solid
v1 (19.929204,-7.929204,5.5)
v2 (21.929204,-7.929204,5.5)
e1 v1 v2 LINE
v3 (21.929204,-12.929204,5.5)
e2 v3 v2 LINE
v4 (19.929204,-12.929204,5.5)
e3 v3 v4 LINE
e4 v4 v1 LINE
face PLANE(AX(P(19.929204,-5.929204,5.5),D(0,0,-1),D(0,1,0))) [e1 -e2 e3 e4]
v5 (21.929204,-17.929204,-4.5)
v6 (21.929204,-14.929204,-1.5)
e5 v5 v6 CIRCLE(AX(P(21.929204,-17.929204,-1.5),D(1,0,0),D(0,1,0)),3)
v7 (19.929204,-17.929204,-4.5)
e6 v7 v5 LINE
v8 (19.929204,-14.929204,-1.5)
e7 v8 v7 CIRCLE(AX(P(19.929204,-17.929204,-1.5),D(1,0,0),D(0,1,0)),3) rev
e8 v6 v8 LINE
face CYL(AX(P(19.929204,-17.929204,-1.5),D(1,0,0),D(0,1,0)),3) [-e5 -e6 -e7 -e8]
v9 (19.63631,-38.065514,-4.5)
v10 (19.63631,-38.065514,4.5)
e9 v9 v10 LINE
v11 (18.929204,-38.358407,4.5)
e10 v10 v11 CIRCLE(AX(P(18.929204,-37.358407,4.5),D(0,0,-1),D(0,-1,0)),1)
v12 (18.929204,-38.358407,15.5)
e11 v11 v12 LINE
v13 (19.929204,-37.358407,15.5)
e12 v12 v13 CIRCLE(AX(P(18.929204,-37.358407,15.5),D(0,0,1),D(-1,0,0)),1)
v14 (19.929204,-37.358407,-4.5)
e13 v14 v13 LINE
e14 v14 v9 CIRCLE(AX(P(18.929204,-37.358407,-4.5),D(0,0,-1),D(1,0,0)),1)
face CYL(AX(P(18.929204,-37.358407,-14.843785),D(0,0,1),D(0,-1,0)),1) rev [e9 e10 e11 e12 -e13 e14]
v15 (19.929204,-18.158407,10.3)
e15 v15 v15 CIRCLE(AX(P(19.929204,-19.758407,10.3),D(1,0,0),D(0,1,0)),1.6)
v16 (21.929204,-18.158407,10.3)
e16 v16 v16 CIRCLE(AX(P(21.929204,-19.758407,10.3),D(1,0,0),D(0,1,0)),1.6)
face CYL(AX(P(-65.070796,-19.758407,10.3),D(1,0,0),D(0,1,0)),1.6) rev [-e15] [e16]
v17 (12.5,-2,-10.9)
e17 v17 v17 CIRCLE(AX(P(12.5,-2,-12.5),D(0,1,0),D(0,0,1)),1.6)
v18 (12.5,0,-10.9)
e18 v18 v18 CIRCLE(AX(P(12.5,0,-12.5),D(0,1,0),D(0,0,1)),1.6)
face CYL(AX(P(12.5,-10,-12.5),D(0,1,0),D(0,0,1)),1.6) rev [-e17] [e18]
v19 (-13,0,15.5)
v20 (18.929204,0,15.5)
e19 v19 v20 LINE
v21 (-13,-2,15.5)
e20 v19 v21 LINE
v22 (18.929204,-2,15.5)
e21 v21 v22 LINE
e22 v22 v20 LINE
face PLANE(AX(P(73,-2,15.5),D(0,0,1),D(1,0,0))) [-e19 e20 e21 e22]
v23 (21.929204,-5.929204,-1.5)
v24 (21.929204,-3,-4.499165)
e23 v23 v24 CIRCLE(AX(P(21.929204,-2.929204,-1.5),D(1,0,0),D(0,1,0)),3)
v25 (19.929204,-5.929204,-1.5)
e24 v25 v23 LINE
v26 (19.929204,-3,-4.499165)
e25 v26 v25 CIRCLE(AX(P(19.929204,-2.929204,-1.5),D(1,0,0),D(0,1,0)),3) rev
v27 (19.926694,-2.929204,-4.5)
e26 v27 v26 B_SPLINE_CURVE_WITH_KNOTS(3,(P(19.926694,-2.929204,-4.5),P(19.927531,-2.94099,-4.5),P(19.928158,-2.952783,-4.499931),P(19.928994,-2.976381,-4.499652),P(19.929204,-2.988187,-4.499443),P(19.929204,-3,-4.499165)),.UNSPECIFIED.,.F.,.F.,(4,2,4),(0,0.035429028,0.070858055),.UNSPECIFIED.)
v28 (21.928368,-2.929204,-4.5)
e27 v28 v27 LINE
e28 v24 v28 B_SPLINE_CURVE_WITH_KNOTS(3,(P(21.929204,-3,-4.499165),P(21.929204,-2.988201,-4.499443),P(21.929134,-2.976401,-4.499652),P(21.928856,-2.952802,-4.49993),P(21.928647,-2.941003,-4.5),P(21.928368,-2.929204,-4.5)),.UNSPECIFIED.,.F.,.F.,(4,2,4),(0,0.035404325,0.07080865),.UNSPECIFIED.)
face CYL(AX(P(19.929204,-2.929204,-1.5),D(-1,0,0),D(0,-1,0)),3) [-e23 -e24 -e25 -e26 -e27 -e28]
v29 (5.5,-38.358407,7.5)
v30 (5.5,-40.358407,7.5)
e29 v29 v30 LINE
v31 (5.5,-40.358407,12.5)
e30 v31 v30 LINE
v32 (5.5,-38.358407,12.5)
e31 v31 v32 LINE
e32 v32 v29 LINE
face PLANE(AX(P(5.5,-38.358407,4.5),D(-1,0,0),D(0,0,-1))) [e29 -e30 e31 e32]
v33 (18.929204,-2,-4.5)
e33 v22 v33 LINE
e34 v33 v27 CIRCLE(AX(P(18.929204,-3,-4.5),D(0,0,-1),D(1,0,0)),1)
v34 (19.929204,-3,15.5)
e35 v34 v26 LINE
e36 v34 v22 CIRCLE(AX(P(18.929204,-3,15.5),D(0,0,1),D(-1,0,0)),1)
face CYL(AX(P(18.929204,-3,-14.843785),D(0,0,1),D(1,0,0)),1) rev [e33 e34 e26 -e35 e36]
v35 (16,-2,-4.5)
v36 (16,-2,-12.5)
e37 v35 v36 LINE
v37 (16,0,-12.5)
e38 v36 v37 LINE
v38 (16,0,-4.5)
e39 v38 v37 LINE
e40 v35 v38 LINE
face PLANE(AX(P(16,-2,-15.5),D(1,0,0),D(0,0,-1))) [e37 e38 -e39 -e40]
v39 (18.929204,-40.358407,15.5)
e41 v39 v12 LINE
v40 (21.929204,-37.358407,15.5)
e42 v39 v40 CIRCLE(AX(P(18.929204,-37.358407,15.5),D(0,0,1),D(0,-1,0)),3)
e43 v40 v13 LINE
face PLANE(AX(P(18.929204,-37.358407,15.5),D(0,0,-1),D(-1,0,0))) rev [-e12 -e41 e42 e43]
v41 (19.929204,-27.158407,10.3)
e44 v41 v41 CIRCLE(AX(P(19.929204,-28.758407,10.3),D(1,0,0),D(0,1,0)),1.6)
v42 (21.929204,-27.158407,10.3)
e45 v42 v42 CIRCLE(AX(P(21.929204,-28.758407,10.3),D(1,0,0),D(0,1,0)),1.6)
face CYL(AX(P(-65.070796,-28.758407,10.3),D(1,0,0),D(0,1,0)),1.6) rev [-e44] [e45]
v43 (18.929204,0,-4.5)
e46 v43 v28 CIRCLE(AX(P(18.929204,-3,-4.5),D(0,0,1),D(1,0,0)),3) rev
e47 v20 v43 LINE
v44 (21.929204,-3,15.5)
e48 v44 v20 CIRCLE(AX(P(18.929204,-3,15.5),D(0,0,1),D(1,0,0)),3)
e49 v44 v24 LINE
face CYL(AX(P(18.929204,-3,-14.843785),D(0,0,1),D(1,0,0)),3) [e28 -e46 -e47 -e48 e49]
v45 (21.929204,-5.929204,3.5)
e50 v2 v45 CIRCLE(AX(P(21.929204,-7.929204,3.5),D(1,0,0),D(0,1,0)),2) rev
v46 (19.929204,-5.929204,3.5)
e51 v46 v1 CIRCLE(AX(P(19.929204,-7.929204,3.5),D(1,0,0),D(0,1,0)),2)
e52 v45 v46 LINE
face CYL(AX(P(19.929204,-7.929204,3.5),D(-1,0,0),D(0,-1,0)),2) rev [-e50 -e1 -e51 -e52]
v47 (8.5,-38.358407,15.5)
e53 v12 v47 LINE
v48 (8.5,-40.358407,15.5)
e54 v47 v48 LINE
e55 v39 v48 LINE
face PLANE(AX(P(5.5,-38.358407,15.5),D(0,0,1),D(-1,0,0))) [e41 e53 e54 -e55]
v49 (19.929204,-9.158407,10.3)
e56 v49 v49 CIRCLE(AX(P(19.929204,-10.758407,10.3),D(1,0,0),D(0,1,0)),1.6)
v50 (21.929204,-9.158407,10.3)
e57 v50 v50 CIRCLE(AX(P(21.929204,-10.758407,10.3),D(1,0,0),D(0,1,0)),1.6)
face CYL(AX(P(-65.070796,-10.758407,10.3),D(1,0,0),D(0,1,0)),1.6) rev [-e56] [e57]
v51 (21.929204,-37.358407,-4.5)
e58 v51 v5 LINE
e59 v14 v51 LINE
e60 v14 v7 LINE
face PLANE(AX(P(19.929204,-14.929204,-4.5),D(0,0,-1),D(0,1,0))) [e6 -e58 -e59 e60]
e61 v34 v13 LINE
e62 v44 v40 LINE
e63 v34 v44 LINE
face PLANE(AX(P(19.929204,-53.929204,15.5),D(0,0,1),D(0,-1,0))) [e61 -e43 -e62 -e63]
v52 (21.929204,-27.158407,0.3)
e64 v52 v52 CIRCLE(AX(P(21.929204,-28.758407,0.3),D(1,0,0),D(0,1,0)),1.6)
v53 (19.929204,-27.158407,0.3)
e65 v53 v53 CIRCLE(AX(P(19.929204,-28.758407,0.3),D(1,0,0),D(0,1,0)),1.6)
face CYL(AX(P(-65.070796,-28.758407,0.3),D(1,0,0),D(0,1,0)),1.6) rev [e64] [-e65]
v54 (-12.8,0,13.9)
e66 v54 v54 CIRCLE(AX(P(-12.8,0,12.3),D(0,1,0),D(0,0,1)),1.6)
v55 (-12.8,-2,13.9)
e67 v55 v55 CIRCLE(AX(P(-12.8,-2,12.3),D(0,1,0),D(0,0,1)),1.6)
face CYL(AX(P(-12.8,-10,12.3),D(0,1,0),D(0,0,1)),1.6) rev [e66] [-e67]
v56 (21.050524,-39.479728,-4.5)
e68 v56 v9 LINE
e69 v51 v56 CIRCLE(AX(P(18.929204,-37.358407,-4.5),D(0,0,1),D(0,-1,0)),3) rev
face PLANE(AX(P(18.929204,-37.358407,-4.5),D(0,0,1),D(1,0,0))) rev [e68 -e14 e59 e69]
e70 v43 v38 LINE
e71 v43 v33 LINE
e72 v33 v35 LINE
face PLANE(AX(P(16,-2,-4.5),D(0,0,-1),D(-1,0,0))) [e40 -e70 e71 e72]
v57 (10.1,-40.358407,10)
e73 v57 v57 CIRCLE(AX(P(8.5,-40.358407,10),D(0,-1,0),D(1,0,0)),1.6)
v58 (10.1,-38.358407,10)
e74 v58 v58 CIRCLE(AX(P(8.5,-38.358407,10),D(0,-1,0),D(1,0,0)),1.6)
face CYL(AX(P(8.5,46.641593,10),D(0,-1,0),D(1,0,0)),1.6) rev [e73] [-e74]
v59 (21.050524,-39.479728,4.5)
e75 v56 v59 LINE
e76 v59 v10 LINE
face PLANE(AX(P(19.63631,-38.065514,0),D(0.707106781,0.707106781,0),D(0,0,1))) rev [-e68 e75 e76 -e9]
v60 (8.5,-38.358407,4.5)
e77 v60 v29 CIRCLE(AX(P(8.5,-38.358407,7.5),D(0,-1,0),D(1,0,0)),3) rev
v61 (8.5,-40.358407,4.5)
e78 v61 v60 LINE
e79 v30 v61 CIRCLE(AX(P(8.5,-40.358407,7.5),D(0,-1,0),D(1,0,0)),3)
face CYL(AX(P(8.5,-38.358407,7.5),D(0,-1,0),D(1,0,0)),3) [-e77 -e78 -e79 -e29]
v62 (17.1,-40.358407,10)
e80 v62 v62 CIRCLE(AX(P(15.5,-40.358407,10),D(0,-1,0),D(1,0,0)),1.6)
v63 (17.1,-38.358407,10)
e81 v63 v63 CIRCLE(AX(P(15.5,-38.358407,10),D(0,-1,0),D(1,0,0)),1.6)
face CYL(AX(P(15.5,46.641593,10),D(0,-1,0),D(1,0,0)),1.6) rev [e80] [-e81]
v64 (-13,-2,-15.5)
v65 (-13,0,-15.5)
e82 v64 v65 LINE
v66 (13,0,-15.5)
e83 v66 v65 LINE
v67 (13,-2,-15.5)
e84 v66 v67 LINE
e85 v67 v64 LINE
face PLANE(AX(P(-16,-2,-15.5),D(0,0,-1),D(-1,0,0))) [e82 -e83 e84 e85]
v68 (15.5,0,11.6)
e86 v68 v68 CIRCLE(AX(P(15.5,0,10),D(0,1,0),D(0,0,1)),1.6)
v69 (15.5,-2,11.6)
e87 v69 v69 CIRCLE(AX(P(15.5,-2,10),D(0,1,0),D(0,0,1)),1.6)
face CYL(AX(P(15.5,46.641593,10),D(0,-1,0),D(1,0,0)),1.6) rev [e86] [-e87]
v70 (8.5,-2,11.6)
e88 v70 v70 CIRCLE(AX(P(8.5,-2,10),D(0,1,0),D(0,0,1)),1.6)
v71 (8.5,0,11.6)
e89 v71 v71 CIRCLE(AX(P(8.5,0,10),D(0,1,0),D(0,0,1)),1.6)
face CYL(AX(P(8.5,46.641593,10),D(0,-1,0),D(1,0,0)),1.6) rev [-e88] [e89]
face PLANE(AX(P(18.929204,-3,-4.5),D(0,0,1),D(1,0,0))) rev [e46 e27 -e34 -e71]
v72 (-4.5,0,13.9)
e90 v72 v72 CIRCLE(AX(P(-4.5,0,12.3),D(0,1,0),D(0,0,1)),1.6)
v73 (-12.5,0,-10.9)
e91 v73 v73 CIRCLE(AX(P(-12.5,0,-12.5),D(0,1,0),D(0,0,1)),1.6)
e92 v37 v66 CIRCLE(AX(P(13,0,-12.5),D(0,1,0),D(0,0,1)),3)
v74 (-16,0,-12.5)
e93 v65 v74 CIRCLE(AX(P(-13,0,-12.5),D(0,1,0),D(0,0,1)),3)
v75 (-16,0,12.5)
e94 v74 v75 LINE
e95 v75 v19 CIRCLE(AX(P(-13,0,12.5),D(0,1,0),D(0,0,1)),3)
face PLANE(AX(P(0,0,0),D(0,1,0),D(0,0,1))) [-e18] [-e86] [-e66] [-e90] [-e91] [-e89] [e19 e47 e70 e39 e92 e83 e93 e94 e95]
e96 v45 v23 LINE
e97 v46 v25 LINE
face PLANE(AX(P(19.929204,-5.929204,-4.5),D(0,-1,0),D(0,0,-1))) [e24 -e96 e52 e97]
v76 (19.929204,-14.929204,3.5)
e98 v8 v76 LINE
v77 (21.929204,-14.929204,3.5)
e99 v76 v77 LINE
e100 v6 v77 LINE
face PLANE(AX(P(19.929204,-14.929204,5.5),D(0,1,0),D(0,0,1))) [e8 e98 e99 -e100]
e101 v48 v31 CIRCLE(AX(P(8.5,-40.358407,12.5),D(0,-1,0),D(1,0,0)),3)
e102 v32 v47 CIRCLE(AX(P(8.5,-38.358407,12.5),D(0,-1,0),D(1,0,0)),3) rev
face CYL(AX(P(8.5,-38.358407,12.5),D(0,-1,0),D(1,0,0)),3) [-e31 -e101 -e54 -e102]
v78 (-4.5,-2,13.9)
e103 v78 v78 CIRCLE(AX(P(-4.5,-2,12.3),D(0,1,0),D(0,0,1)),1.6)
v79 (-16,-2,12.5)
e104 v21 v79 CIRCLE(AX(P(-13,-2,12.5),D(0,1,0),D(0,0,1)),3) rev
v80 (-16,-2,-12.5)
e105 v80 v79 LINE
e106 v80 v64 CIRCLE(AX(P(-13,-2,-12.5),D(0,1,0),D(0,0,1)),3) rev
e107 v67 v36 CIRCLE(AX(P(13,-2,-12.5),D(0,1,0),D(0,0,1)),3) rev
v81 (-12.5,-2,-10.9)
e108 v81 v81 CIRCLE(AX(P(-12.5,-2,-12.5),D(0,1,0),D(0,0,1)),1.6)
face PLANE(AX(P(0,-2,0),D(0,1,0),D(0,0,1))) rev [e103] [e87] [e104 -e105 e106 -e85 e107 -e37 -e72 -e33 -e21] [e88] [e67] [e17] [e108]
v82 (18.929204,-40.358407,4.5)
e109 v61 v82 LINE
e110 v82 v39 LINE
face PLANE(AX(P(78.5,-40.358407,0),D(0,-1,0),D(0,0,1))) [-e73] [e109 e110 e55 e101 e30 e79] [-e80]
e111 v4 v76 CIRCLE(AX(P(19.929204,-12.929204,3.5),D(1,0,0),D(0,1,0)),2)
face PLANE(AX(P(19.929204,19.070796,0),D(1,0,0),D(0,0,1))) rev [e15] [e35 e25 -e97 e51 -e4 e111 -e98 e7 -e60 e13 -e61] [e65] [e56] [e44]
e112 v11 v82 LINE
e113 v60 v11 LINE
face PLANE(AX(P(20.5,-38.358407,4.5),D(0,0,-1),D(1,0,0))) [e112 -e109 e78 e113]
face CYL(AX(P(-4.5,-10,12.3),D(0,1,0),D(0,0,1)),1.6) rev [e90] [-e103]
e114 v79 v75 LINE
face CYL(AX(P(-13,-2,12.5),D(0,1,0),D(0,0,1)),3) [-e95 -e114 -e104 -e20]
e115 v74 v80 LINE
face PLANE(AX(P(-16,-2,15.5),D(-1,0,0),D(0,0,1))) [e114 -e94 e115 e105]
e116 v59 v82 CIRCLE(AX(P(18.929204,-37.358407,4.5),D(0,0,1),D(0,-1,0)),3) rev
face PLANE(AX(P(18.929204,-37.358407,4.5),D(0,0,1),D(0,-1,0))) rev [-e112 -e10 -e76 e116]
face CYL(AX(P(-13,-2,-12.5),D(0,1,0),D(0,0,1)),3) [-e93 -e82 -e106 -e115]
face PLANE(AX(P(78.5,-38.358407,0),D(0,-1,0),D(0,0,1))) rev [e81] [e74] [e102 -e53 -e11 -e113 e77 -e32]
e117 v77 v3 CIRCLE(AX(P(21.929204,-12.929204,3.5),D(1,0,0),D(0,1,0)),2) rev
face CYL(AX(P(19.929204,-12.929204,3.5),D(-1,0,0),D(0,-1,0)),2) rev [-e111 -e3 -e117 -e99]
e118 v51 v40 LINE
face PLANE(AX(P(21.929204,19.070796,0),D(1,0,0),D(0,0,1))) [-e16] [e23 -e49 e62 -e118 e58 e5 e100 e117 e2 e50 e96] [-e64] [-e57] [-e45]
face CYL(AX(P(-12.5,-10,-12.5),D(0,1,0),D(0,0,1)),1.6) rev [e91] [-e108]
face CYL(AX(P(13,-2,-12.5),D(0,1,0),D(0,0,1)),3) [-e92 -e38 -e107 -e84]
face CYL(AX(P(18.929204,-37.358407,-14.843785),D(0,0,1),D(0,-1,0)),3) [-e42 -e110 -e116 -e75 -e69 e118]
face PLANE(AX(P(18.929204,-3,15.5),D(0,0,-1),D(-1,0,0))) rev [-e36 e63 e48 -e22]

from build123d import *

# Parameters (mm, degrees)
SM_BASE_FLANGE_1_DEPTH = 2
OTHER_START            = -4.5
OTHER_3_DEPTH          = 20
OTHER_3_2_OUTLINE_W    = 2
OTHER_3_2_OUTLINE_H    = 24
OTHER_3_2_DEPTH        = 20
OTHER_START_2          = 5.5
OTHER_3_3_OUTLINE_W    = 2
OTHER_3_3_OUTLINE_H    = 15
OTHER_3_3_OUTLINE_H_2  = 9
OTHER_3_3_DEPTH        = 10
OTHER_START_3          = 4.5
OTHER_3_4_OUTLINE_W    = 2
OTHER_3_4_OUTLINE_H    = 15
OTHER_3_4_DEPTH        = 1
OTHER_4_DEPTH          = 20
OTHER_4_2_DEPTH        = 9
OTHER_4_3_DEPTH        = 11
OTHER_4_4_DEPTH        = 9
SKETCH_10_R            = 1.6
CUT_EXTRUDE_1_DEPTH    = 10
SKETCH_11_R            = 1.6
CUT_EXTRUDE_2_DEPTH    = 10
SKETCH_13_R            = 1.6
CUT_EXTRUDE_3_DEPTH    = 87
CUT_EXTRUDE_4_DEPTH    = 87
SKETCH_15_R            = 1.6
CUT_EXTRUDE_5_DEPTH    = 87
FILLET_1_R             = 3
FILLET_2_R             = 2


# Read off the part's stored shape, not the designer's step: 绘制的折弯3, 绘制的折弯4
# Sheet-metal steps are written as plain solids
with BuildPart() as part:
    # Sketch 1 → 基体-法兰1 (new body)
    with BuildSketch(Plane(origin=(0, 0, 0), x_dir=(1, 0, 0), z_dir=(0, 1, 0))):
        Polygon((-16, -15.5), (16, -15.5), (73, -15.5), (73, -4.5), (58, -4.5), (58, 4.5), (34, 4.5), (34, -5.5), (25, -5.5), (25, 4.5), (16, 4.5), (16, 15.5), (-16, 15.5), align=None)
    extrude(amount=-SM_BASE_FLANGE_1_DEPTH)

    # Other 3 outline → Other 3 (cut)
    with BuildSketch(Plane.XY.offset(OTHER_START)):
        with BuildLine():
            ThreePointArc((18.929203673, 0), (20.661254481, -0.550510257), (21.757630798, -2))
            Line((21.757630798, -2), (73, -2))
            Line((73, -2), (73, 0))
            Line((73, 0), (18.929203673, 0))
        make_face()
    extrude(amount=OTHER_3_DEPTH, mode=Mode.SUBTRACT)

    # Other 3 2 outline → Other 3 2 (add)
    with BuildSketch(Plane.XY.offset(OTHER_START)):
        with Locations((20.929203673, -26.929203673)):
            Rectangle(OTHER_3_2_OUTLINE_W, OTHER_3_2_OUTLINE_H)
        with BuildLine():
            Line((19.929203673, -3), (19.929203673, -5.929203673))
            Line((19.929203673, -5.929203673), (21.929203673, -5.929203673))
            Line((21.929203673, -5.929203673), (21.929203673, -3))
            ThreePointArc((21.929203673, -3), (21.885999352, -2.492694064), (21.757630798, -2))
            Line((21.757630798, -2), (18.929203673, -2))
            ThreePointArc((18.929203673, -2), (19.636310454, -2.292893219), (19.929203673, -3))
        make_face()
    extrude(amount=OTHER_3_2_DEPTH)

    # Other 3 3 outline → Other 3 3 (add)
    with BuildSketch(Plane.XY.offset(OTHER_START_2)):
        with Locations((20.929203673, -46.429203673)):
            Rectangle(OTHER_3_3_OUTLINE_W, OTHER_3_3_OUTLINE_H)
        with Locations((20.929203673, -10.429203673)):
            Rectangle(OTHER_3_3_OUTLINE_W, OTHER_3_3_OUTLINE_H_2)
    extrude(amount=OTHER_3_3_DEPTH)

    # Other 3 4 outline → Other 3 4 (add)
    with BuildSketch(Plane.XY.offset(OTHER_START_3)):
        with Locations((20.929203673, -46.429203673)):
            Rectangle(OTHER_3_4_OUTLINE_W, OTHER_3_4_OUTLINE_H)
    extrude(amount=OTHER_3_4_DEPTH)

    # Other 4 outline → Other 4 (cut)
    with BuildSketch(Plane.XY.offset(OTHER_START)):
        with BuildLine():
            Line((19.929203673, -40.186834471), (19.929203673, -53.929203673))
            Line((19.929203673, -53.929203673), (21.929203673, -53.929203673))
            Line((21.929203673, -53.929203673), (21.929203673, -37.358407346))
            ThreePointArc((21.929203673, -37.358407346), (21.378693416, -39.090458154), (19.929203673, -40.186834471))
        make_face()
    extrude(amount=OTHER_4_DEPTH, mode=Mode.SUBTRACT)

    # Other 4 2 outline → Other 4 2 (cut)
    with BuildSketch(Plane.XY.offset(OTHER_START)):
        Polygon((19.929203673, -38.929203673), (20.5, -38.929203673), (19.929203673, -38.358407347), align=None)
    extrude(amount=OTHER_4_2_DEPTH, mode=Mode.SUBTRACT)

    # Other 4 3 outline → Other 4 3 (add)
    with BuildSketch(Plane.XY.offset(OTHER_START_3)):
        with BuildLine():
            ThreePointArc((18.929203673, -40.358407346), (19.436509609, -40.315203025), (19.929203673, -40.186834471))
            Line((19.929203673, -40.186834471), (19.929203673, -37.358407346))
            ThreePointArc((19.929203673, -37.358407346), (19.636310454, -38.065514128), (18.929203673, -38.358407346))
            Line((18.929203673, -38.358407346), (5.5, -38.358407346))
            Line((5.5, -38.358407346), (5.5, -40.358407346))
            Line((5.5, -40.358407346), (18.929203673, -40.358407346))
        make_face()
    extrude(amount=OTHER_4_3_DEPTH)

    # Other 4 4 outline → Other 4 4 (add)
    with BuildSketch(Plane.XY.offset(OTHER_START)):
        with BuildLine():
            Line((20.5, -38.929203673), (21.050524017, -39.47972769))
            ThreePointArc((21.050524017, -39.47972769), (21.283955222, -39.217209419), (21.485098605, -38.929203673))
            Line((21.485098605, -38.929203673), (20.5, -38.929203673))
        make_face()
        with BuildLine():
            Line((19.636310454, -38.065514128), (19.929203673, -38.358407347))
            Line((19.929203673, -38.358407347), (19.929203673, -37.358407346))
            ThreePointArc((19.929203673, -37.358407346), (19.853083206, -37.741090779), (19.636310454, -38.065514128))
        make_face()
    extrude(amount=OTHER_4_4_DEPTH)

    # 草图10 → 切除-拉伸1 (cut)
    with BuildSketch(Plane(origin=(0, 0, 0), x_dir=(1, 0, 0), z_dir=(0, 1, 0))):
        with Locations(Location((-12.5, 12.5, 0), (0, 0, 270))):
            Circle(SKETCH_10_R)
        with Locations(Location((12.5, 12.5, 0), (0, 0, 270))):
            Circle(SKETCH_10_R)
    extrude(amount=-CUT_EXTRUDE_1_DEPTH, mode=Mode.SUBTRACT)

    # 草图11 → 切除-拉伸2 (cut)
    with BuildSketch(Plane(origin=(0, 0, 0), x_dir=(1, 0, 0), z_dir=(0, 1, 0))):
        with Locations(Location((-12.8, -12.3, 0), (0, 0, 270))):
            Circle(SKETCH_11_R)
        with Locations(Location((-4.5, -12.3, 0), (0, 0, 270))):
            Circle(SKETCH_11_R)
    extrude(amount=-CUT_EXTRUDE_2_DEPTH, mode=Mode.SUBTRACT)

    # 草图13 → 切除-拉伸3 (cut)
    with BuildSketch(Plane(origin=(0, -40.358407346, 0), x_dir=(-1, 0, 0), z_dir=(0, -1, 0))):
        with Locations(Location((-8.5, -10, 0), (0, 0, 180))):
            Circle(SKETCH_13_R)
        with Locations(Location((-15.5, -10, 0), (0, 0, 180))):
            Circle(SKETCH_13_R)
    extrude(amount=-CUT_EXTRUDE_3_DEPTH, mode=Mode.SUBTRACT)

    # 草图14 → 切除-拉伸4 (cut)
    with BuildSketch(Plane(origin=(21.929203673, 0, 0), x_dir=(0, 0, -1), z_dir=(1, 0, 0))):
        with BuildLine():
            Line((-10.3, -19.758407346), (-10.3, -20.179203673))
            Line((-10.3, -20.179203673), (-10.3, -21.358407346))
            ThreePointArc((-10.3, -21.358407346), (-9.16862915, -20.889778196), (-8.7, -19.758407346))
            ThreePointArc((-8.7, -19.758407346), (-9.16862915, -18.627036497), (-10.3, -18.158407346))
            Line((-10.3, -18.158407346), (-10.3, -19.758407346))
        make_face()
        with BuildLine():
            ThreePointArc((-10.3, -18.158407346), (-11.571470433, -18.78713862), (-11.843674335, -20.179203673))
            Line((-11.843674335, -20.179203673), (-10.3, -20.179203673))
            Line((-10.3, -20.179203673), (-10.3, -19.758407346))
            Line((-10.3, -19.758407346), (-10.3, -18.158407346))
        make_face()
        with BuildLine():
            Line((-10.3, -20.179203673), (-11.843674335, -20.179203673))
            ThreePointArc((-11.843674335, -20.179203673), (-11.271268726, -21.029877779), (-10.3, -21.358407346))
            Line((-10.3, -21.358407346), (-10.3, -20.179203673))
        make_face()
        with BuildLine():
            ThreePointArc((-8.7, -28.758407346), (-9.16862915, -27.627036497), (-10.3, -27.158407346))
            Line((-10.3, -27.158407346), (-10.3, -28.758407346))
            Line((-10.3, -28.758407346), (-10.3, -30.358407346))
            ThreePointArc((-10.3, -30.358407346), (-9.16862915, -29.889778196), (-8.7, -28.758407346))
        make_face()
        with BuildLine():
            Line((-10.3, -28.758407346), (-10.3, -27.158407346))
            ThreePointArc((-10.3, -27.158407346), (-11.9, -28.758407346), (-10.3, -30.358407346))
            Line((-10.3, -30.358407346), (-10.3, -28.758407346))
        make_face()
        with BuildLine():
            ThreePointArc((-8.7, -10.758407346), (-11.43137085, -9.627036497), (-10.3, -12.358407346))
            ThreePointArc((-10.3, -12.358407346), (-9.16862915, -11.889778196), (-8.7, -10.758407346))
        make_face()
    extrude(amount=-CUT_EXTRUDE_4_DEPTH, mode=Mode.SUBTRACT)

    # 草图15 → 切除-拉伸5 (cut)
    with BuildSketch(Plane(origin=(21.929203673, 0, 0), x_dir=(0, 0, -1), z_dir=(1, 0, 0))):
        with Locations(Location((-0.3, -28.758407346, 0), (0, 0, 90))):
            Circle(SKETCH_15_R)
    extrude(amount=-CUT_EXTRUDE_5_DEPTH, mode=Mode.SUBTRACT)

    # 圆角1
    fillet_1_edges = [part.edges().sort_by_distance(p)[0] for p in [
        (5.5, -39.358407346, 4.5),
        (5.5, -39.358407346, 15.5),
        (20.929203673, -5.929203673, -4.5),
        (20.929203673, -14.929203673, -4.5),
        (16, -1, -15.5),
        (-16, -1, -15.5),
        (-16, -1, 15.5),
    ]]
    fillet(fillet_1_edges, radius=FILLET_1_R)

    # 圆角2
    fillet_2_edges = [part.edges().sort_by_distance(p)[0] for p in [
        (20.929203673, -5.929203673, 5.5),
        (20.929203673, -14.929203673, 5.5),
    ]]
    fillet(fillet_2_edges, radius=FILLET_2_R)


solid = part.part
